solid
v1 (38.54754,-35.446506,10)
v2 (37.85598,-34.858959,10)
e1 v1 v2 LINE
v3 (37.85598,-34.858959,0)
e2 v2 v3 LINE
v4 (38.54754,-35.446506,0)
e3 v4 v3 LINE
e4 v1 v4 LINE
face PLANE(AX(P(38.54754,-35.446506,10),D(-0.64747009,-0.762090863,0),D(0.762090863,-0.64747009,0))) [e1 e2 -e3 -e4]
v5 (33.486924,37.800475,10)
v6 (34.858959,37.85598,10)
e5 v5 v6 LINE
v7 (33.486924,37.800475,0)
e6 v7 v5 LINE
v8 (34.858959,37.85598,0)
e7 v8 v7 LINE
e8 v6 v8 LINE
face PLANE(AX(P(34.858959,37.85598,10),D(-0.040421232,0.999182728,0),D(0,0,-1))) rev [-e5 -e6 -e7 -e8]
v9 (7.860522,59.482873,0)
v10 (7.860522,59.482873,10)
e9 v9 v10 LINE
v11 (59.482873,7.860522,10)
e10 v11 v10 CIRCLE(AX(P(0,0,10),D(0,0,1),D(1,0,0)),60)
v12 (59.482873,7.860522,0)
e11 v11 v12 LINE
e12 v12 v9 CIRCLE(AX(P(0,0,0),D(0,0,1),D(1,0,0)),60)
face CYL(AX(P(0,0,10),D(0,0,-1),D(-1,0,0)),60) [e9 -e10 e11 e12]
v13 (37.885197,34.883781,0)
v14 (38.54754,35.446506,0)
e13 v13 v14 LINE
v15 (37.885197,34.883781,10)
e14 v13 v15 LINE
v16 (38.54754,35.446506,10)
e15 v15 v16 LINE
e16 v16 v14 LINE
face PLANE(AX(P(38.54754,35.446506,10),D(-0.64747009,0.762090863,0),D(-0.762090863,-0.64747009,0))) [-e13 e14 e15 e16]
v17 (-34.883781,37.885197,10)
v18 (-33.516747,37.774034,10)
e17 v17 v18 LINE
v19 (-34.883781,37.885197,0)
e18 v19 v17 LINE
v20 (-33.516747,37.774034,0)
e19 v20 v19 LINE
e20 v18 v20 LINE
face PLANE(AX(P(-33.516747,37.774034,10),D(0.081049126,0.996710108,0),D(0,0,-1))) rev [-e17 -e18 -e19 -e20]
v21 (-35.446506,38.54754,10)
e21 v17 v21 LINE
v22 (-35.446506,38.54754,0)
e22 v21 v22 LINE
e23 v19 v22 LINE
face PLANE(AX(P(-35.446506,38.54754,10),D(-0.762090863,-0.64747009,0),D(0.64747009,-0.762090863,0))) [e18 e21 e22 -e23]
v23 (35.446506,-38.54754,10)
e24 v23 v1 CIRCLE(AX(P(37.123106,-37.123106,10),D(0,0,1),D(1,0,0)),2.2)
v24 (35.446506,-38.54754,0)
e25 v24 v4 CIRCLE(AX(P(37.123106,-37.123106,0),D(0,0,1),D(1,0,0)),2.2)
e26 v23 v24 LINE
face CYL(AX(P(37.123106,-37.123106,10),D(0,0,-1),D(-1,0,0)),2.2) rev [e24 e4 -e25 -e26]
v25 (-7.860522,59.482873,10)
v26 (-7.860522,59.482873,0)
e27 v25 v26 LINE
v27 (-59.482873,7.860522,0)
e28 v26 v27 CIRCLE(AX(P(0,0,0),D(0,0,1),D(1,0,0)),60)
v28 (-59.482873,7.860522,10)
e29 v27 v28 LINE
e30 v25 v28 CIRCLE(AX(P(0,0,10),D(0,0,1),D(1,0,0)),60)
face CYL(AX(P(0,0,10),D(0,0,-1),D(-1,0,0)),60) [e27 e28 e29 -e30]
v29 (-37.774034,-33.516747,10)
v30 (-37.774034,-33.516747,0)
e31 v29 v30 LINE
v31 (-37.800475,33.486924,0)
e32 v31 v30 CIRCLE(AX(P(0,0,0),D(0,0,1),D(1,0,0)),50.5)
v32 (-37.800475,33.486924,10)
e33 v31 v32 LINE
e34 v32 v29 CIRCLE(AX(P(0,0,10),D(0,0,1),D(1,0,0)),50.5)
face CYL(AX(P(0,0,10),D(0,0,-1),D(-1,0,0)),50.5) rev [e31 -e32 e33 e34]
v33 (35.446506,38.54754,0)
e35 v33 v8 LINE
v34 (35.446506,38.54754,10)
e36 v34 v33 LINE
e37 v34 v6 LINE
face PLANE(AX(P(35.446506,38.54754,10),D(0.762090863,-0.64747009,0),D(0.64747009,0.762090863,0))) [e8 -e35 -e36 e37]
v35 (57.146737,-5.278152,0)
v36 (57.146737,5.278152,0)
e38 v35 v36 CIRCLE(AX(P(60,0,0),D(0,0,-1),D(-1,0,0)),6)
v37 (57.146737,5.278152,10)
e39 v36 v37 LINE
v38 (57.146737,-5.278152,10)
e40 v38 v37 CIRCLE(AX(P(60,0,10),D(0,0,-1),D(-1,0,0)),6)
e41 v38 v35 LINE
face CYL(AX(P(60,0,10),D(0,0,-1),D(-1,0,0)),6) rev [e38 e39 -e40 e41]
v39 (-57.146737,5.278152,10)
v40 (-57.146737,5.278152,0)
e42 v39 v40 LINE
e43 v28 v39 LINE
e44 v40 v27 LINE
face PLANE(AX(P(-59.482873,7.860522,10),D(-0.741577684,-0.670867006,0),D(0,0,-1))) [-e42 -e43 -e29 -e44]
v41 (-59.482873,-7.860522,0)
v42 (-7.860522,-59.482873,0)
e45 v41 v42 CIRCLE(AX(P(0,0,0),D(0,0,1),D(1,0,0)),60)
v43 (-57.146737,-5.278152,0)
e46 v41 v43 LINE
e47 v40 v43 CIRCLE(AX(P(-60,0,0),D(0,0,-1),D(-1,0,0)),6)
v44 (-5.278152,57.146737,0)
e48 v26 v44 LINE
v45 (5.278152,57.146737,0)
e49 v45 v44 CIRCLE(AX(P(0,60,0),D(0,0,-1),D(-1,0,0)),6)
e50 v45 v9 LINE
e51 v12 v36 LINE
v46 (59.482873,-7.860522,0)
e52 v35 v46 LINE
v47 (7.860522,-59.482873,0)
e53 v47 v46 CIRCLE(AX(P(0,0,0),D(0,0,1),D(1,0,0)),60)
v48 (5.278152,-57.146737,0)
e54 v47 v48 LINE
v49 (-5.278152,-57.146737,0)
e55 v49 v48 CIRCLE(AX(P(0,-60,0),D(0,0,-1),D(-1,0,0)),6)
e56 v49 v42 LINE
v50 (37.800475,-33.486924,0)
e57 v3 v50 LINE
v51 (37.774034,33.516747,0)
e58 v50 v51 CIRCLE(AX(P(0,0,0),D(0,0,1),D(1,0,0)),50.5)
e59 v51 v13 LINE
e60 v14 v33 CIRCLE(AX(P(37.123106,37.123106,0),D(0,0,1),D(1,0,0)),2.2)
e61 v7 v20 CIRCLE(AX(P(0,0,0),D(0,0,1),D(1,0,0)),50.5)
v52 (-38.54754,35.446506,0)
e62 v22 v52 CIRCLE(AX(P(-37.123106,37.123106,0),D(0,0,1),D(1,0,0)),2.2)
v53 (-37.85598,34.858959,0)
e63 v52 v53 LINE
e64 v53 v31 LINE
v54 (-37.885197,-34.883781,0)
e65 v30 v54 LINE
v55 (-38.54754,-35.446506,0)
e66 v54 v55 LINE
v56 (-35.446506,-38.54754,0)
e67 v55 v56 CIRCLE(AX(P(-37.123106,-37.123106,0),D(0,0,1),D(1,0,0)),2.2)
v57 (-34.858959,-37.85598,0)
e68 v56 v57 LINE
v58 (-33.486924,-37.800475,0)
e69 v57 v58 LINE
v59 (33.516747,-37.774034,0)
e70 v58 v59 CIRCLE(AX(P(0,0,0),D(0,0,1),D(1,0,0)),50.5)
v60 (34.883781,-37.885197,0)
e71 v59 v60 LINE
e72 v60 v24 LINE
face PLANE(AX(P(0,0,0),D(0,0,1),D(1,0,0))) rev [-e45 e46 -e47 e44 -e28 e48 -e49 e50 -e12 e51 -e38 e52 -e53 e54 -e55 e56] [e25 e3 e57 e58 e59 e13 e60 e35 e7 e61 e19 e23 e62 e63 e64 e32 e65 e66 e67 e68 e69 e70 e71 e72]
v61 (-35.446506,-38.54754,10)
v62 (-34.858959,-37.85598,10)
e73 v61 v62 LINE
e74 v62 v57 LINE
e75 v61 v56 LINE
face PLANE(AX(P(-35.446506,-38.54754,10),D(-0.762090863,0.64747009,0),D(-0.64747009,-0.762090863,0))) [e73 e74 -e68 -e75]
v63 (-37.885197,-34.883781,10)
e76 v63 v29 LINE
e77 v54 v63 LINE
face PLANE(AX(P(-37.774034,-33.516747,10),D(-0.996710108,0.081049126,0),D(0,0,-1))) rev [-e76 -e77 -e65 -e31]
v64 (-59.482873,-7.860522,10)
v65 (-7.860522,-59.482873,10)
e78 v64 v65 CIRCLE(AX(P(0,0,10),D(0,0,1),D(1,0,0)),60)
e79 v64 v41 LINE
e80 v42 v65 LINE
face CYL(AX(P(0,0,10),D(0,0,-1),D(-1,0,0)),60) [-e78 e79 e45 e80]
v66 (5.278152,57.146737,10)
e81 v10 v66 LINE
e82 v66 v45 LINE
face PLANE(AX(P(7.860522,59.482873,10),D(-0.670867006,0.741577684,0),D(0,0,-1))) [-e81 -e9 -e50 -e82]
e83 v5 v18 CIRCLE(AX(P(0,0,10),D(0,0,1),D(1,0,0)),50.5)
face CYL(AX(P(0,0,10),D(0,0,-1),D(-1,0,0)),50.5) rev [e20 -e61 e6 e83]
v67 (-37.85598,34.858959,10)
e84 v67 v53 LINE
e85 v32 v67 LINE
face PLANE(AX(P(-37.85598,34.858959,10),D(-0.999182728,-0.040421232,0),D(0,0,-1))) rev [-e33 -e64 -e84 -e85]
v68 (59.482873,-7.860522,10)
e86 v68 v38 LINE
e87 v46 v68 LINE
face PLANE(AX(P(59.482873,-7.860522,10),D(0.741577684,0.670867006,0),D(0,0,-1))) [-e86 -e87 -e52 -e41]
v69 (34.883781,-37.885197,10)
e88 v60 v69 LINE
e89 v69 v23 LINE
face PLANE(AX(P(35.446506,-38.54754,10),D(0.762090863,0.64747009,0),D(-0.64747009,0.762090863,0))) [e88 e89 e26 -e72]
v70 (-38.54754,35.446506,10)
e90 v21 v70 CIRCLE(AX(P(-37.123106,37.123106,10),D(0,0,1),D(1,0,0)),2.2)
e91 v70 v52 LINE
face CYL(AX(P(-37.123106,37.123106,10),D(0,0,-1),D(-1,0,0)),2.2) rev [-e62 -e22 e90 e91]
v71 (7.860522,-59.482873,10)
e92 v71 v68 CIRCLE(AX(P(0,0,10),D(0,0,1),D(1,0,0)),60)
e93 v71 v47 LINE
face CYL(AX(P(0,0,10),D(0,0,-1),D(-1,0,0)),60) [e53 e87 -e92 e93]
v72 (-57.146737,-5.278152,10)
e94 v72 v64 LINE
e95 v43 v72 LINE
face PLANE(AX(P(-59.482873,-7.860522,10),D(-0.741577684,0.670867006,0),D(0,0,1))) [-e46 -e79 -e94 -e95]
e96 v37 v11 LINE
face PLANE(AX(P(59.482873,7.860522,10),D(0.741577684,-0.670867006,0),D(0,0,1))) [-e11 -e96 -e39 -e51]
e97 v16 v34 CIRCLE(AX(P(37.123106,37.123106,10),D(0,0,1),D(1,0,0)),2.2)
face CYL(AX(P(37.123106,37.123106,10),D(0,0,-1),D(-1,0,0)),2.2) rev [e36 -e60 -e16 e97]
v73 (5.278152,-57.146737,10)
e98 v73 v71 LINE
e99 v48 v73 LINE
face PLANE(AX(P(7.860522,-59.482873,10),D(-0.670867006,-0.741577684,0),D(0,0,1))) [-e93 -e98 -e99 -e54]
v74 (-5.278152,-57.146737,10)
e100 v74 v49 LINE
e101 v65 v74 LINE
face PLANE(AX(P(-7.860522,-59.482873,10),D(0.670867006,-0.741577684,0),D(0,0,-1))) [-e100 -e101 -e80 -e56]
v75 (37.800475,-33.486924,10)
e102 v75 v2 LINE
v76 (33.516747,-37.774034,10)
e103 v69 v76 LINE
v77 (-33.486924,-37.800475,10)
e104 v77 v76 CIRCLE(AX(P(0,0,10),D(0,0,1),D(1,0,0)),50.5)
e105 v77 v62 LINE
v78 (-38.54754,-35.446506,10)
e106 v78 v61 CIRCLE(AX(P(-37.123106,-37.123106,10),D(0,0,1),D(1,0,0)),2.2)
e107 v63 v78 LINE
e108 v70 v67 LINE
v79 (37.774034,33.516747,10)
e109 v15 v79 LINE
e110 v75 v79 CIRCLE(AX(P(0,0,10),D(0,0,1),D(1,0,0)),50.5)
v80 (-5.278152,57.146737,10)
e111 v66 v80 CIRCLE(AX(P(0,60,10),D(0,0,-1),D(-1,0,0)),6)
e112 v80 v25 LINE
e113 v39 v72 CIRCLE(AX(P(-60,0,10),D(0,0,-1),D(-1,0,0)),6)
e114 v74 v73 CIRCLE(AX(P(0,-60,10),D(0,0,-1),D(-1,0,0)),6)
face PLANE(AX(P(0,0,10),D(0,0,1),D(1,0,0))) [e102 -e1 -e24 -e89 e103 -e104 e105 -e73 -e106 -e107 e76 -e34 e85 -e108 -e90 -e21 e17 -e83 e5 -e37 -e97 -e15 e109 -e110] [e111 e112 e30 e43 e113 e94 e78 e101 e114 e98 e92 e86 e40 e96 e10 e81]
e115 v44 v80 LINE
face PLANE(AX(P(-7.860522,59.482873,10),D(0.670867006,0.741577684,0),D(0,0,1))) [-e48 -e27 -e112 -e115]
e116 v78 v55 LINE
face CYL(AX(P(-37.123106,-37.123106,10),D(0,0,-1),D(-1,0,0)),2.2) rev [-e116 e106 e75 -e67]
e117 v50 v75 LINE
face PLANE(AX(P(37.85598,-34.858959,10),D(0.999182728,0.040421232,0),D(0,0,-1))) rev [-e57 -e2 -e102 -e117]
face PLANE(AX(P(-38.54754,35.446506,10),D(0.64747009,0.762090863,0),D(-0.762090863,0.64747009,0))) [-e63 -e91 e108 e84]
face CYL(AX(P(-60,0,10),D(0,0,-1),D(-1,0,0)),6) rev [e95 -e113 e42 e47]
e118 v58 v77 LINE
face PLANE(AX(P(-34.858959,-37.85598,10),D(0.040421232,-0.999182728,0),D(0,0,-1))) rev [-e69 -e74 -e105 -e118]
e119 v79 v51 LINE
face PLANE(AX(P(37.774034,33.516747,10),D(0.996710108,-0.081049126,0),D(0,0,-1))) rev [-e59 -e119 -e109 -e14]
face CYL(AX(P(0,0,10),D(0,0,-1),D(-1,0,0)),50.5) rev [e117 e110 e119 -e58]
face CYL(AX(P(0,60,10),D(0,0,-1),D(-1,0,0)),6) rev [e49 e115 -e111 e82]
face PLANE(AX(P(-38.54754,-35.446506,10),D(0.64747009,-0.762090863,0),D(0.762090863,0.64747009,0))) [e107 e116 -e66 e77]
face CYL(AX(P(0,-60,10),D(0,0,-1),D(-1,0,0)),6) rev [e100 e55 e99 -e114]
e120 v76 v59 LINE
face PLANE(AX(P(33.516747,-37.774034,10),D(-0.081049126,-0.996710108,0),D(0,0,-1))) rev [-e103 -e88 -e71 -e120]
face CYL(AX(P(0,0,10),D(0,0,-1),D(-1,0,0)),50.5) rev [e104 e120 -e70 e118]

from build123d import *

# Parameters (mm, degrees)
SKETCH_1_R          = 60
EXTRUDE_1_DEPTH     = 10
CHAMFER_1_SIZE      = 0.961662122
CHAMFER_1_SIZE_2    = 1
SKETCH_2_R          = 6
CUT_EXTRUDE_1_DEPTH = 10


with BuildPart() as part:
    # 草图1 → 凸台-拉伸1 (new body)
    with BuildSketch(Plane.XY):
        Circle(SKETCH_1_R)
        with BuildLine():
            Line((-38.547540209, 35.446506114), (-37.123106012, 34.236311133))
            ThreePointArc((-37.123106012, 34.236311133), (-50.5, 0), (-37.123106012, -34.236311133))
            Line((-37.123106012, -34.236311133), (-38.547540209, -35.446506114))
            ThreePointArc((-38.547540209, -35.446506114), (-38.678740931, -38.678740931), (-35.446506114, -38.547540209))
            Line((-35.446506114, -38.547540209), (-34.236311133, -37.123106012))
            ThreePointArc((-34.236311133, -37.123106012), (0, -50.5), (34.236311133, -37.123106012))
            Line((34.236311133, -37.123106012), (35.446506114, -38.547540209))
            ThreePointArc((35.446506114, -38.547540209), (38.678740931, -38.678740931), (38.547540209, -35.446506114))
            Line((38.547540209, -35.446506114), (37.123106012, -34.236311133))
            ThreePointArc((37.123106012, -34.236311133), (50.5, 0), (37.123106012, 34.236311133))
            Line((37.123106012, 34.236311133), (38.547540209, 35.446506114))
            ThreePointArc((38.547540209, 35.446506114), (38.678740931, 38.678740931), (35.446506114, 38.547540209))
            Line((35.446506114, 38.547540209), (34.236311133, 37.123106012))
            ThreePointArc((34.236311133, 37.123106012), (0, 50.5), (-34.236311133, 37.123106012))
            Line((-34.236311133, 37.123106012), (-35.446506114, 38.547540209))
            ThreePointArc((-35.446506114, 38.547540209), (-38.678740931, 38.678740931), (-38.547540209, 35.446506114))
        make_face(mode=Mode.SUBTRACT)
    extrude(amount=EXTRUDE_1_DEPTH)

    # 倒角1
    # the kernel refuses this chamfer: 1, 0.961662122 mm, written as the material it takes off along each edge
    with BuildSketch(Plane(origin=(34.236311133, 37.123106012, -2.597741643), x_dir=(-0.7418547410377812, 0.6705606185869901, 0), z_dir=(0, 0, 1)), Plane(origin=(-37.123106012, 34.236311133, -2.597741643), x_dir=(-0.6705606185869967, -0.741854741037775, 0), z_dir=(0, 0, 1)), Plane(origin=(-34.236311133, -37.123106012, -2.597741643), x_dir=(0.7418547410378011, -0.670560618586968, 0), z_dir=(0, 0, 1)), Plane(origin=(37.123106012, -34.236311133, -2.597741643), x_dir=(0.6705606185869861, 0.7418547410377846, 0), z_dir=(0, 0, 1))) as chamfer_1_piece_1:
        with BuildLine():
            Line((1.010153596, 0), (CHAMFER_1_SIZE * 0.0306993646522, -CHAMFER_1_SIZE * 0.999528663409))
            Line((CHAMFER_1_SIZE * 0.0306993646522, -CHAMFER_1_SIZE * 0.999528663409), (0, 0))
            ThreePointArc((0, 0), (0.519364344, -0.00252381), (1.010153596, 0))
        make_face()
    extrude(amount=15.195483286, mode=Mode.SUBTRACT)
    with BuildSketch(Plane(origin=(-34.236311133, 37.123106012, -2.571682988), x_dir=(-0.6474700896278034, 0.7620908627174087, 0), z_dir=(0, 0, 1)), Plane(origin=(-37.123106012, -34.236311133, -2.571682988), x_dir=(-0.7620908627174083, -0.6474700896278041, 0), z_dir=(0, 0, 1)), Plane(origin=(34.236311133, -37.123106012, -2.571682988), x_dir=(0.6474700896277805, -0.7620908627174282, 0), z_dir=(0, 0, 1)), Plane(origin=(37.123106012, 34.236311133, -2.571682988), x_dir=(0.7620908627174152, 0.6474700896277957, 0), z_dir=(0, 0, 1))) as chamfer_1_piece_2:
        with BuildLine():
            Line((CHAMFER_1_SIZE_2, 0), (0.030170276, -0.969829724))
            ThreePointArc((0.030170276, -0.969829724), (0.017838593, -0.498535983), (0, 0))
            Line((0, 0), (CHAMFER_1_SIZE_2, 0))
        make_face()
    extrude(amount=15.143365976, mode=Mode.SUBTRACT)

    # 草图2 → 切除-拉伸1 (cut)
    with BuildSketch(Plane(origin=(0, 0, 0), x_dir=(-1, 0, 0), z_dir=(0, 0, -1))):
        with Locations((60, 0)):
            Circle(SKETCH_2_R)
        with Locations((-60, 0)):
            Circle(SKETCH_2_R)
        with Locations((0, -60)):
            Circle(SKETCH_2_R)
        with Locations((0, 60)):
            Circle(SKETCH_2_R)
    extrude(amount=-CUT_EXTRUDE_1_DEPTH, mode=Mode.SUBTRACT)

    # 倒角2
    # the kernel refuses this chamfer: 2, 1.907033604 mm, written as the material it takes off along each edge
    with BuildSketch(Plane(origin=(-5.992495307, 59.7, 16.798280923), x_dir=(-0.9933125969799259, -0.11545598590369961, 0), z_dir=(0, 0, -1)), Plane(origin=(59.7, 5.992495307, 16.798280923), x_dir=(-0.11545598590369978, 0.9933125969799259, 0), z_dir=(0, 0, -1)), Plane(origin=(5.992495307, -59.7, 16.798280923), x_dir=(0.993312596979926, 0.11545598590369918, 0), z_dir=(0, 0, -1)), Plane(origin=(-59.7, -5.992495307, 16.798280923), x_dir=(0.11545598590370064, -0.9933125969799258, 0), z_dir=(0, 0, -1))) as chamfer_2_piece_1:
        with BuildLine():
            Line((1.880602566, 0), (-0.414776487, -2.618663345))
            ThreePointArc((-0.414776487, -2.618663345), (-0.066481971, -1.366902402), (0, 0))
            ThreePointArc((0, 0), (0.966657818, 0.007362718), (1.880602566, 0))
        make_face()
    extrude(amount=23.596561846, mode=Mode.SUBTRACT)
    with BuildSketch(Plane(origin=(5.992495307, 59.7, 16.798280923), x_dir=(0.9933125969799259, -0.11545598590369989, 0), z_dir=(0, 0, -1))) as chamfer_2_piece_2:
        with BuildLine():
            Line((1.880602566, 0), (-0.414776487, 2.618663345))
            ThreePointArc((-0.414776487, 2.618663345), (-0.066481971, 1.366902402), (0, 0))
            ThreePointArc((0, 0), (0.966657818, -0.007362718), (1.880602566, 0))
        make_face()
    extrude(amount=23.596561846, mode=Mode.SUBTRACT)
    with BuildSketch(Plane(origin=(-5.992495307, -59.7, 16.798280923), x_dir=(0.26943037499341854, 0.9630198715659537, 0), z_dir=(0, 0, -1)), Plane(origin=(59.7, -5.992495307, 16.798280923), x_dir=(-0.963019871565954, 0.26943037499341704, 0), z_dir=(0, 0, -1)), Plane(origin=(-59.7, 5.992495307, 16.798280923), x_dir=(0.9630198715659543, -0.26943037499341643, 0), z_dir=(0, 0, -1))) as chamfer_2_piece_3:
        with BuildLine():
            Line((2.651308592, 0), (-0.294205559, -1.857446931))
            ThreePointArc((-0.294205559, -1.857446931), (-0.158498115, -0.953603635), (0, 0))
            ThreePointArc((0, 0), (1.360472479, -0.148177801), (2.651308592, 0))
        make_face()
    extrude(amount=23.596561846, mode=Mode.SUBTRACT)


solid = part.part
